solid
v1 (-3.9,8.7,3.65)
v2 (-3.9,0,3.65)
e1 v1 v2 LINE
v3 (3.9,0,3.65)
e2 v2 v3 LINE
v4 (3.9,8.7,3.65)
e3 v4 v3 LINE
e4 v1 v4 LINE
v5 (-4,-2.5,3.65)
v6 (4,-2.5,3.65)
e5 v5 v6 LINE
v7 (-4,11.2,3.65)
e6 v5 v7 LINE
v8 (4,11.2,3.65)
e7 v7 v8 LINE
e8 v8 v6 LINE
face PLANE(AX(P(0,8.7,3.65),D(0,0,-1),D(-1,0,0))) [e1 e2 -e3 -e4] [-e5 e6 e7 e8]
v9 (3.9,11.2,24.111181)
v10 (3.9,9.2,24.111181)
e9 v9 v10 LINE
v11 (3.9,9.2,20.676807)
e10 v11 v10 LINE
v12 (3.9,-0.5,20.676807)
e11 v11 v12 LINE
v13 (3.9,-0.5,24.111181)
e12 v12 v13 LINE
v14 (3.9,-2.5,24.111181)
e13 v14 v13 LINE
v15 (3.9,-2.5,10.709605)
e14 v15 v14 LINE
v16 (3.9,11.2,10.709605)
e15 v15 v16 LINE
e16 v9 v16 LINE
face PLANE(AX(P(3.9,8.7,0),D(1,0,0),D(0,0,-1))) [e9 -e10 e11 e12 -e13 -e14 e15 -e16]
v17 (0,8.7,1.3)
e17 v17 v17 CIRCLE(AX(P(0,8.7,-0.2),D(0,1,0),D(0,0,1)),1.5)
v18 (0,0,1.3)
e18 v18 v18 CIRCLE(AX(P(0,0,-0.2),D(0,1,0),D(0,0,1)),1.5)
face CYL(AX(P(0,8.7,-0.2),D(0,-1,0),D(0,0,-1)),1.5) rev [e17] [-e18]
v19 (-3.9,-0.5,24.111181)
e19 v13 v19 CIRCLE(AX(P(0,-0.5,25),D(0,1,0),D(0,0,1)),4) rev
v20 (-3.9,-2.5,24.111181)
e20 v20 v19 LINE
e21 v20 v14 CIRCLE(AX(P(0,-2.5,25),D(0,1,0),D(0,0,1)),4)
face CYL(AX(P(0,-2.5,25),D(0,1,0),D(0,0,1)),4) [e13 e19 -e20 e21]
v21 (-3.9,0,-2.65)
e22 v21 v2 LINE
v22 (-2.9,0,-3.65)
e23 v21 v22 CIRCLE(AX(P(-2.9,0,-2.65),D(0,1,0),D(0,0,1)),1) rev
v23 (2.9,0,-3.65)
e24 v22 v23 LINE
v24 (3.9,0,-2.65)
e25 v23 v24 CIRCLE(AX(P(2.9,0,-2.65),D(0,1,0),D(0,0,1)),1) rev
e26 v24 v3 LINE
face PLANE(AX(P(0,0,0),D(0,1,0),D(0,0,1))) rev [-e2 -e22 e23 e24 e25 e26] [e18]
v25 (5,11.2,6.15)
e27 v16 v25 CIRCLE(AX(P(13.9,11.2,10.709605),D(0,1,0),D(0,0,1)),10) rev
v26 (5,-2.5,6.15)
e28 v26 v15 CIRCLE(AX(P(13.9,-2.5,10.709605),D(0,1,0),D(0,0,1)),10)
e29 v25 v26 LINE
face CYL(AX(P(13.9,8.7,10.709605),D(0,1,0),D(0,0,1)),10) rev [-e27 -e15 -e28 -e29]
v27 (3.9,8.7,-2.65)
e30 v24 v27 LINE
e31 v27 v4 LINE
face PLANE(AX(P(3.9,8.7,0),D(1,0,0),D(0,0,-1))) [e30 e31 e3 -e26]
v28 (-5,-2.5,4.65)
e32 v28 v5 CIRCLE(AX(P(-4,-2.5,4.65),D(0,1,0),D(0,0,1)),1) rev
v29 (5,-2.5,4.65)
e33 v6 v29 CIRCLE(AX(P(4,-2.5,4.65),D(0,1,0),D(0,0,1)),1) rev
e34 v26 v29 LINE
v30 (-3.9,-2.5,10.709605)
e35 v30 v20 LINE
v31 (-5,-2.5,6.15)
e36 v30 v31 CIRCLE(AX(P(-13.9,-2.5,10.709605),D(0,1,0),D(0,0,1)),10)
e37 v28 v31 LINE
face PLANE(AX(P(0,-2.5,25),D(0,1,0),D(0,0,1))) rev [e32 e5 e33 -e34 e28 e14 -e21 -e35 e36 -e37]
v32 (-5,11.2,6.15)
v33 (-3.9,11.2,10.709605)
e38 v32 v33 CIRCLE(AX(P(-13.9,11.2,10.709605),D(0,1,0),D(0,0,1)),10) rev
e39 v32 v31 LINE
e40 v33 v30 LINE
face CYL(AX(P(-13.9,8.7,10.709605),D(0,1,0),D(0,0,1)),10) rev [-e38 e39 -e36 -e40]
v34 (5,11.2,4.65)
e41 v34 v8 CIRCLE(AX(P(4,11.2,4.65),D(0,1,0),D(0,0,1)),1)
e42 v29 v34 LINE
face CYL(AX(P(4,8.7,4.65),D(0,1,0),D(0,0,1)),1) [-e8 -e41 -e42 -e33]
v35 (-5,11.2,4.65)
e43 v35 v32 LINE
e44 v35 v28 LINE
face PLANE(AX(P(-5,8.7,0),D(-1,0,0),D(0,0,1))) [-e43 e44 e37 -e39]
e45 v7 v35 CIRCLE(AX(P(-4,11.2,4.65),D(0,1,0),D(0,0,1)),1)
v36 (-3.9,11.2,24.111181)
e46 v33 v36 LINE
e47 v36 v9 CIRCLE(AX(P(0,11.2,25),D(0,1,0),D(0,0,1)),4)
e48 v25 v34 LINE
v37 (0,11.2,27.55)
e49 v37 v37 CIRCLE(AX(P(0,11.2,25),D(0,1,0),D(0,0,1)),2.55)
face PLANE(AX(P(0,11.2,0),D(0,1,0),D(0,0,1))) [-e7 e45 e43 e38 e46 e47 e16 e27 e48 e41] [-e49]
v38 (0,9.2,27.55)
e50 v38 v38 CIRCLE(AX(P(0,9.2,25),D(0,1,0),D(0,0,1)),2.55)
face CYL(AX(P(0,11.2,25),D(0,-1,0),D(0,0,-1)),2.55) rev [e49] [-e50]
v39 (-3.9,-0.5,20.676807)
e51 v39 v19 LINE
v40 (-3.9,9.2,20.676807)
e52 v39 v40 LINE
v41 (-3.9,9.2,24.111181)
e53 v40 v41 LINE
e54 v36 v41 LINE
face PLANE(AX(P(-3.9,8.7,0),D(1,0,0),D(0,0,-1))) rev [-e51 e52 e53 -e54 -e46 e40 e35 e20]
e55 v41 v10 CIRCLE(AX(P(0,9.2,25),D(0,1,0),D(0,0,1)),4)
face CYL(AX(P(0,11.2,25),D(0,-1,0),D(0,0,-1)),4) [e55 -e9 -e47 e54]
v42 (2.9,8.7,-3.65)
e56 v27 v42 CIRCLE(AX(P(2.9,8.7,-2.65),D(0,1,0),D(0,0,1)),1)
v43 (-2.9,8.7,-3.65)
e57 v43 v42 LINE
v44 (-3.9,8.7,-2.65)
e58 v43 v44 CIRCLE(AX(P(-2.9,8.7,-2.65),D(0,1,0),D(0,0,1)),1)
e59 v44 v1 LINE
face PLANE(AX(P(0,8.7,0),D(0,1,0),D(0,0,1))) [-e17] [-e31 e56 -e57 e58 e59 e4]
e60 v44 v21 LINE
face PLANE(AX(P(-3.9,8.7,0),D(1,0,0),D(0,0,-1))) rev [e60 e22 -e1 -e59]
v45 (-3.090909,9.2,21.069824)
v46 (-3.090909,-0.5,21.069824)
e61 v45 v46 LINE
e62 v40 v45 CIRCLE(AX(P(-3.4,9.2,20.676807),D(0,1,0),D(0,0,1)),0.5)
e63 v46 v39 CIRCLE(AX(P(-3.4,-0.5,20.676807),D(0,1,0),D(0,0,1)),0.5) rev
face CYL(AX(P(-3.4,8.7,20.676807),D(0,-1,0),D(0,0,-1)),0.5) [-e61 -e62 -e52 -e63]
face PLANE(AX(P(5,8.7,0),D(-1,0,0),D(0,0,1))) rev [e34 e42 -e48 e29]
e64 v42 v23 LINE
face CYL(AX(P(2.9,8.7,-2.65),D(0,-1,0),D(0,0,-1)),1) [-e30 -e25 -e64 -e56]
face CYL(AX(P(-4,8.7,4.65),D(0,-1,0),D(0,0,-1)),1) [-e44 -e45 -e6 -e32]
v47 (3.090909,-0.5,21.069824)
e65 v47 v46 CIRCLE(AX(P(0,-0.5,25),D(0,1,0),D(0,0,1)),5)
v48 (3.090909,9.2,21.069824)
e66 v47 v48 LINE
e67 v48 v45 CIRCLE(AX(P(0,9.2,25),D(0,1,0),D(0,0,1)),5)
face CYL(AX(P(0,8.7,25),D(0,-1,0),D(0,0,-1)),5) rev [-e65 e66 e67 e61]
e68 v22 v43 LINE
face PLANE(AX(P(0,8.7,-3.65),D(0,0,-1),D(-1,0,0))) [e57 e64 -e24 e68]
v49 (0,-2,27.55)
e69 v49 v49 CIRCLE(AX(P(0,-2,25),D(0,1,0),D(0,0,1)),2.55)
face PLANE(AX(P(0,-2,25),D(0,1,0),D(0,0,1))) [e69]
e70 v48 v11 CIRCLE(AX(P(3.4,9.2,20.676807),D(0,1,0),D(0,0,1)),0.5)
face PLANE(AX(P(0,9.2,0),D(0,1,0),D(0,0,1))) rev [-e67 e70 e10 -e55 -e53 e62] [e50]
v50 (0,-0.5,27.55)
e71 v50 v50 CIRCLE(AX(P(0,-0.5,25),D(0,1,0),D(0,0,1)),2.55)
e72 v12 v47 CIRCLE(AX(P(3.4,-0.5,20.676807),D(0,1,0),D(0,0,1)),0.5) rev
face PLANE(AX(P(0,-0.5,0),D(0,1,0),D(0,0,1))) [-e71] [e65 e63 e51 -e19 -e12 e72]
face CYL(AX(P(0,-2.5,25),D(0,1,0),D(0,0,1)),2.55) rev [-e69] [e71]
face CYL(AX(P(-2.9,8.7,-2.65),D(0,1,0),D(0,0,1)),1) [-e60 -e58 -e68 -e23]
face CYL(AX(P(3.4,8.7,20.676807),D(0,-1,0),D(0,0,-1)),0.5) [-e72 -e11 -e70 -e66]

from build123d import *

# Parameters (mm, degrees)
SKETCH2_R           = 1.5
BOSS_EXTRUDE1_DEPTH = 8.7
SKETCH3_R           = 4
SKETCH3_R_2         = 2.55
BOSS_EXTRUDE2_DEPTH = 2.5
BOSS_EXTRUDE3_START = -11.2
SKETCH3_3_R         = 4
SKETCH3_3_R_2       = 2.55
BOSS_EXTRUDE3_DEPTH = 2.5
CUT_EXTRUDE1_START  = -0.5
SKETCH2_3_R         = 5
SKETCH2_3_R_2       = 2.55
CUT_EXTRUDE1_DEPTH  = 9.7
BOSS_EXTRUDE4_START = -2.5
SKETCH2_4_R         = 2.55
BOSS_EXTRUDE4_DEPTH = 0.5
FILLET1_R           = 10
FILLET2_R           = 0.5
FILLET3_R           = 1


with BuildPart() as part:
    # Sketch2 → Boss-Extrude1 (new body)
    with BuildSketch(Plane(origin=(0, 0, 0), x_dir=(1, 0, 0), z_dir=(0, 1, 0))):
        with BuildLine():
            Line((3.9, 3.65), (-3.9, 3.65))
            Line((-3.9, 3.65), (-3.9, -3.65))
            Line((-3.9, -3.65), (-5, -3.65))
            Line((-5, -3.65), (-5, -6.15))
            Line((-5, -6.15), (-3.9, -6.15))
            Line((-3.9, -6.15), (-3.9, -21.871102431))
            ThreePointArc((-3.9, -21.871102431), (0, -20), (3.9, -21.871102431))
            Line((3.9, -21.871102431), (3.9, -6.15))
            Line((3.9, -6.15), (5, -6.15))
            Line((5, -6.15), (5, -3.65))
            Line((5, -3.65), (3.9, -3.65))
            Line((3.9, -3.65), (3.9, 3.65))
        make_face()
        with Locations(Location((0, 0.2, 0), (0, 0, 270))):
            Circle(SKETCH2_R, mode=Mode.SUBTRACT)
    extrude(amount=BOSS_EXTRUDE1_DEPTH)

    # Sketch3 → Boss-Extrude2 (add)
    # profile 1 of 4: a face of its own
    with BuildSketch(Plane(origin=(0, 8.7, 0), x_dir=(1, 0, 0), z_dir=(0, 1, 0))):
        Polygon((-5, -3.65), (-5, -6.15), (-3.9, -6.15), (3.9, -6.15), (5, -6.15), (5, -3.65), (3.9, -3.65), (-3.9, -3.65), align=None)
    # profile 2 of 4: a face of its own
    with BuildSketch(Plane(origin=(0, 8.7, 0), x_dir=(1, 0, 0), z_dir=(0, 1, 0))):
        with BuildLine():
            Line((3.9, -6.15), (-3.9, -6.15))
            Line((-3.9, -6.15), (-3.9, -21.871102431))
            ThreePointArc((-3.9, -21.871102431), (0, -20), (3.9, -21.871102431))
            Line((3.9, -21.871102431), (3.9, -6.15))
        make_face()
    # profile 3 of 4: a face of its own
    with BuildSketch(Plane(origin=(0, 8.7, 0), x_dir=(1, 0, 0), z_dir=(0, 1, 0))):
        with Locations((0, -25)):
            Circle(SKETCH3_R)
        with Locations(Location((0, -25, 0), (0, 0, 270))):
            Circle(SKETCH3_R_2, mode=Mode.SUBTRACT)
    # profile 4 of 4: a face of its own
    with BuildSketch(Plane(origin=(0, 8.7, 0), x_dir=(1, 0, 0), z_dir=(0, 1, 0))):
        with BuildLine():
            ThreePointArc((3.9, -21.871102431), (0, -20), (-3.9, -21.871102431))
            Line((-3.9, -21.871102431), (-3.9, -24.111180558))
            ThreePointArc((-3.9, -24.111180558), (0, -21), (3.9, -24.111180558))
            Line((3.9, -24.111180558), (3.9, -21.871102431))
        make_face()
    extrude(amount=BOSS_EXTRUDE2_DEPTH)

    # Sketch3<3> → Boss-Extrude3 (add)
    # profile 1 of 4: a face of its own
    with BuildSketch(Plane(origin=(0, 8.7, 0), x_dir=(1, 0, 0), z_dir=(0, 1, 0)).offset(BOSS_EXTRUDE3_START)):
        with Locations((0, -25)):
            Circle(SKETCH3_3_R)
        with Locations(Location((0, -25, 0), (0, 0, 270))):
            Circle(SKETCH3_3_R_2, mode=Mode.SUBTRACT)
    # profile 2 of 4: a face of its own
    with BuildSketch(Plane(origin=(0, 8.7, 0), x_dir=(1, 0, 0), z_dir=(0, 1, 0)).offset(BOSS_EXTRUDE3_START)):
        with BuildLine():
            ThreePointArc((3.9, -21.871102431), (0, -20), (-3.9, -21.871102431))
            Line((-3.9, -21.871102431), (-3.9, -24.111180558))
            ThreePointArc((-3.9, -24.111180558), (0, -21), (3.9, -24.111180558))
            Line((3.9, -24.111180558), (3.9, -21.871102431))
        make_face()
    # profile 3 of 4: a face of its own
    with BuildSketch(Plane(origin=(0, 8.7, 0), x_dir=(1, 0, 0), z_dir=(0, 1, 0)).offset(BOSS_EXTRUDE3_START)):
        with BuildLine():
            Line((3.9, -6.15), (-3.9, -6.15))
            Line((-3.9, -6.15), (-3.9, -21.871102431))
            ThreePointArc((-3.9, -21.871102431), (0, -20), (3.9, -21.871102431))
            Line((3.9, -21.871102431), (3.9, -6.15))
        make_face()
    # profile 4 of 4: a face of its own
    with BuildSketch(Plane(origin=(0, 8.7, 0), x_dir=(1, 0, 0), z_dir=(0, 1, 0)).offset(BOSS_EXTRUDE3_START)):
        Polygon((-5, -3.65), (-5, -6.15), (-3.9, -6.15), (3.9, -6.15), (5, -6.15), (5, -3.65), (3.9, -3.65), (-3.9, -3.65), align=None)
    extrude(amount=BOSS_EXTRUDE3_DEPTH)

    # Sketch2<3> → Cut-Extrude1 (cut)
    with BuildSketch(Plane(origin=(0, 0, 0), x_dir=(1, 0, 0), z_dir=(0, 1, 0)).offset(CUT_EXTRUDE1_START)):
        with Locations((0, -25)):
            Circle(SKETCH2_3_R)
        with Locations(Location((0, -25, 0), (0, 0, 270))):
            Circle(SKETCH2_3_R_2, mode=Mode.SUBTRACT)
    extrude(amount=CUT_EXTRUDE1_DEPTH, mode=Mode.SUBTRACT)

    # Sketch2<4> → Boss-Extrude4 (add)
    with BuildSketch(Plane(origin=(0, 0, 0), x_dir=(1, 0, 0), z_dir=(0, 1, 0)).offset(BOSS_EXTRUDE4_START)):
        with Locations(Location((0, -25, 0), (0, 0, 270))):
            Circle(SKETCH2_4_R)
    extrude(amount=BOSS_EXTRUDE4_DEPTH)

    # Fillet1
    # the kernel refuses this fillet: 10 mm, written as the material it adds along each edge
    with BuildSketch(Plane(origin=(-3.9, -2.5, 6.15), x_dir=(-1, 0, 0), z_dir=(0, 1, 0)), Plane(origin=(3.9, 11.2, 6.15), x_dir=(1, 0, 0), z_dir=(0, -1, 0))) as fillet1_piece_1:
        with BuildLine():
            CenterArc((10, 4.559605246), FILLET1_R, 180, 27.126753117)
            Line((0, 4.559605246), (-0.2, 4.559605246))
            Line((-0.2, 4.559605246), (-0.2, 0))
            Line((-0.2, 0), (0, -0.2))
            ThreePointArc((0, -0.2), (0.55, -0.2), (0.922, -0.091192105))
            Line((0.922, -0.091192105), (1.1, 0))
        make_face()
    extrude(amount=13.7)

    # Fillet2
    fillet2_edges = [part.edges().sort_by_distance(p)[0] for p in [
        (3.9, 4.35, 21.871102431),
        (-3.9, 4.35, 21.871102431),
    ]]
    fillet(fillet2_edges, radius=FILLET2_R)

    # Fillet3
    fillet3_edges = [part.edges().sort_by_distance(p)[0] for p in [
        (5, 4.35, 3.65),
        (-5, 4.35, 3.65),
        (-3.9, 4.35, -3.65),
        (3.9, 4.35, -3.65),
    ]]
    fillet(fillet3_edges, radius=FILLET3_R)


solid = part.part
